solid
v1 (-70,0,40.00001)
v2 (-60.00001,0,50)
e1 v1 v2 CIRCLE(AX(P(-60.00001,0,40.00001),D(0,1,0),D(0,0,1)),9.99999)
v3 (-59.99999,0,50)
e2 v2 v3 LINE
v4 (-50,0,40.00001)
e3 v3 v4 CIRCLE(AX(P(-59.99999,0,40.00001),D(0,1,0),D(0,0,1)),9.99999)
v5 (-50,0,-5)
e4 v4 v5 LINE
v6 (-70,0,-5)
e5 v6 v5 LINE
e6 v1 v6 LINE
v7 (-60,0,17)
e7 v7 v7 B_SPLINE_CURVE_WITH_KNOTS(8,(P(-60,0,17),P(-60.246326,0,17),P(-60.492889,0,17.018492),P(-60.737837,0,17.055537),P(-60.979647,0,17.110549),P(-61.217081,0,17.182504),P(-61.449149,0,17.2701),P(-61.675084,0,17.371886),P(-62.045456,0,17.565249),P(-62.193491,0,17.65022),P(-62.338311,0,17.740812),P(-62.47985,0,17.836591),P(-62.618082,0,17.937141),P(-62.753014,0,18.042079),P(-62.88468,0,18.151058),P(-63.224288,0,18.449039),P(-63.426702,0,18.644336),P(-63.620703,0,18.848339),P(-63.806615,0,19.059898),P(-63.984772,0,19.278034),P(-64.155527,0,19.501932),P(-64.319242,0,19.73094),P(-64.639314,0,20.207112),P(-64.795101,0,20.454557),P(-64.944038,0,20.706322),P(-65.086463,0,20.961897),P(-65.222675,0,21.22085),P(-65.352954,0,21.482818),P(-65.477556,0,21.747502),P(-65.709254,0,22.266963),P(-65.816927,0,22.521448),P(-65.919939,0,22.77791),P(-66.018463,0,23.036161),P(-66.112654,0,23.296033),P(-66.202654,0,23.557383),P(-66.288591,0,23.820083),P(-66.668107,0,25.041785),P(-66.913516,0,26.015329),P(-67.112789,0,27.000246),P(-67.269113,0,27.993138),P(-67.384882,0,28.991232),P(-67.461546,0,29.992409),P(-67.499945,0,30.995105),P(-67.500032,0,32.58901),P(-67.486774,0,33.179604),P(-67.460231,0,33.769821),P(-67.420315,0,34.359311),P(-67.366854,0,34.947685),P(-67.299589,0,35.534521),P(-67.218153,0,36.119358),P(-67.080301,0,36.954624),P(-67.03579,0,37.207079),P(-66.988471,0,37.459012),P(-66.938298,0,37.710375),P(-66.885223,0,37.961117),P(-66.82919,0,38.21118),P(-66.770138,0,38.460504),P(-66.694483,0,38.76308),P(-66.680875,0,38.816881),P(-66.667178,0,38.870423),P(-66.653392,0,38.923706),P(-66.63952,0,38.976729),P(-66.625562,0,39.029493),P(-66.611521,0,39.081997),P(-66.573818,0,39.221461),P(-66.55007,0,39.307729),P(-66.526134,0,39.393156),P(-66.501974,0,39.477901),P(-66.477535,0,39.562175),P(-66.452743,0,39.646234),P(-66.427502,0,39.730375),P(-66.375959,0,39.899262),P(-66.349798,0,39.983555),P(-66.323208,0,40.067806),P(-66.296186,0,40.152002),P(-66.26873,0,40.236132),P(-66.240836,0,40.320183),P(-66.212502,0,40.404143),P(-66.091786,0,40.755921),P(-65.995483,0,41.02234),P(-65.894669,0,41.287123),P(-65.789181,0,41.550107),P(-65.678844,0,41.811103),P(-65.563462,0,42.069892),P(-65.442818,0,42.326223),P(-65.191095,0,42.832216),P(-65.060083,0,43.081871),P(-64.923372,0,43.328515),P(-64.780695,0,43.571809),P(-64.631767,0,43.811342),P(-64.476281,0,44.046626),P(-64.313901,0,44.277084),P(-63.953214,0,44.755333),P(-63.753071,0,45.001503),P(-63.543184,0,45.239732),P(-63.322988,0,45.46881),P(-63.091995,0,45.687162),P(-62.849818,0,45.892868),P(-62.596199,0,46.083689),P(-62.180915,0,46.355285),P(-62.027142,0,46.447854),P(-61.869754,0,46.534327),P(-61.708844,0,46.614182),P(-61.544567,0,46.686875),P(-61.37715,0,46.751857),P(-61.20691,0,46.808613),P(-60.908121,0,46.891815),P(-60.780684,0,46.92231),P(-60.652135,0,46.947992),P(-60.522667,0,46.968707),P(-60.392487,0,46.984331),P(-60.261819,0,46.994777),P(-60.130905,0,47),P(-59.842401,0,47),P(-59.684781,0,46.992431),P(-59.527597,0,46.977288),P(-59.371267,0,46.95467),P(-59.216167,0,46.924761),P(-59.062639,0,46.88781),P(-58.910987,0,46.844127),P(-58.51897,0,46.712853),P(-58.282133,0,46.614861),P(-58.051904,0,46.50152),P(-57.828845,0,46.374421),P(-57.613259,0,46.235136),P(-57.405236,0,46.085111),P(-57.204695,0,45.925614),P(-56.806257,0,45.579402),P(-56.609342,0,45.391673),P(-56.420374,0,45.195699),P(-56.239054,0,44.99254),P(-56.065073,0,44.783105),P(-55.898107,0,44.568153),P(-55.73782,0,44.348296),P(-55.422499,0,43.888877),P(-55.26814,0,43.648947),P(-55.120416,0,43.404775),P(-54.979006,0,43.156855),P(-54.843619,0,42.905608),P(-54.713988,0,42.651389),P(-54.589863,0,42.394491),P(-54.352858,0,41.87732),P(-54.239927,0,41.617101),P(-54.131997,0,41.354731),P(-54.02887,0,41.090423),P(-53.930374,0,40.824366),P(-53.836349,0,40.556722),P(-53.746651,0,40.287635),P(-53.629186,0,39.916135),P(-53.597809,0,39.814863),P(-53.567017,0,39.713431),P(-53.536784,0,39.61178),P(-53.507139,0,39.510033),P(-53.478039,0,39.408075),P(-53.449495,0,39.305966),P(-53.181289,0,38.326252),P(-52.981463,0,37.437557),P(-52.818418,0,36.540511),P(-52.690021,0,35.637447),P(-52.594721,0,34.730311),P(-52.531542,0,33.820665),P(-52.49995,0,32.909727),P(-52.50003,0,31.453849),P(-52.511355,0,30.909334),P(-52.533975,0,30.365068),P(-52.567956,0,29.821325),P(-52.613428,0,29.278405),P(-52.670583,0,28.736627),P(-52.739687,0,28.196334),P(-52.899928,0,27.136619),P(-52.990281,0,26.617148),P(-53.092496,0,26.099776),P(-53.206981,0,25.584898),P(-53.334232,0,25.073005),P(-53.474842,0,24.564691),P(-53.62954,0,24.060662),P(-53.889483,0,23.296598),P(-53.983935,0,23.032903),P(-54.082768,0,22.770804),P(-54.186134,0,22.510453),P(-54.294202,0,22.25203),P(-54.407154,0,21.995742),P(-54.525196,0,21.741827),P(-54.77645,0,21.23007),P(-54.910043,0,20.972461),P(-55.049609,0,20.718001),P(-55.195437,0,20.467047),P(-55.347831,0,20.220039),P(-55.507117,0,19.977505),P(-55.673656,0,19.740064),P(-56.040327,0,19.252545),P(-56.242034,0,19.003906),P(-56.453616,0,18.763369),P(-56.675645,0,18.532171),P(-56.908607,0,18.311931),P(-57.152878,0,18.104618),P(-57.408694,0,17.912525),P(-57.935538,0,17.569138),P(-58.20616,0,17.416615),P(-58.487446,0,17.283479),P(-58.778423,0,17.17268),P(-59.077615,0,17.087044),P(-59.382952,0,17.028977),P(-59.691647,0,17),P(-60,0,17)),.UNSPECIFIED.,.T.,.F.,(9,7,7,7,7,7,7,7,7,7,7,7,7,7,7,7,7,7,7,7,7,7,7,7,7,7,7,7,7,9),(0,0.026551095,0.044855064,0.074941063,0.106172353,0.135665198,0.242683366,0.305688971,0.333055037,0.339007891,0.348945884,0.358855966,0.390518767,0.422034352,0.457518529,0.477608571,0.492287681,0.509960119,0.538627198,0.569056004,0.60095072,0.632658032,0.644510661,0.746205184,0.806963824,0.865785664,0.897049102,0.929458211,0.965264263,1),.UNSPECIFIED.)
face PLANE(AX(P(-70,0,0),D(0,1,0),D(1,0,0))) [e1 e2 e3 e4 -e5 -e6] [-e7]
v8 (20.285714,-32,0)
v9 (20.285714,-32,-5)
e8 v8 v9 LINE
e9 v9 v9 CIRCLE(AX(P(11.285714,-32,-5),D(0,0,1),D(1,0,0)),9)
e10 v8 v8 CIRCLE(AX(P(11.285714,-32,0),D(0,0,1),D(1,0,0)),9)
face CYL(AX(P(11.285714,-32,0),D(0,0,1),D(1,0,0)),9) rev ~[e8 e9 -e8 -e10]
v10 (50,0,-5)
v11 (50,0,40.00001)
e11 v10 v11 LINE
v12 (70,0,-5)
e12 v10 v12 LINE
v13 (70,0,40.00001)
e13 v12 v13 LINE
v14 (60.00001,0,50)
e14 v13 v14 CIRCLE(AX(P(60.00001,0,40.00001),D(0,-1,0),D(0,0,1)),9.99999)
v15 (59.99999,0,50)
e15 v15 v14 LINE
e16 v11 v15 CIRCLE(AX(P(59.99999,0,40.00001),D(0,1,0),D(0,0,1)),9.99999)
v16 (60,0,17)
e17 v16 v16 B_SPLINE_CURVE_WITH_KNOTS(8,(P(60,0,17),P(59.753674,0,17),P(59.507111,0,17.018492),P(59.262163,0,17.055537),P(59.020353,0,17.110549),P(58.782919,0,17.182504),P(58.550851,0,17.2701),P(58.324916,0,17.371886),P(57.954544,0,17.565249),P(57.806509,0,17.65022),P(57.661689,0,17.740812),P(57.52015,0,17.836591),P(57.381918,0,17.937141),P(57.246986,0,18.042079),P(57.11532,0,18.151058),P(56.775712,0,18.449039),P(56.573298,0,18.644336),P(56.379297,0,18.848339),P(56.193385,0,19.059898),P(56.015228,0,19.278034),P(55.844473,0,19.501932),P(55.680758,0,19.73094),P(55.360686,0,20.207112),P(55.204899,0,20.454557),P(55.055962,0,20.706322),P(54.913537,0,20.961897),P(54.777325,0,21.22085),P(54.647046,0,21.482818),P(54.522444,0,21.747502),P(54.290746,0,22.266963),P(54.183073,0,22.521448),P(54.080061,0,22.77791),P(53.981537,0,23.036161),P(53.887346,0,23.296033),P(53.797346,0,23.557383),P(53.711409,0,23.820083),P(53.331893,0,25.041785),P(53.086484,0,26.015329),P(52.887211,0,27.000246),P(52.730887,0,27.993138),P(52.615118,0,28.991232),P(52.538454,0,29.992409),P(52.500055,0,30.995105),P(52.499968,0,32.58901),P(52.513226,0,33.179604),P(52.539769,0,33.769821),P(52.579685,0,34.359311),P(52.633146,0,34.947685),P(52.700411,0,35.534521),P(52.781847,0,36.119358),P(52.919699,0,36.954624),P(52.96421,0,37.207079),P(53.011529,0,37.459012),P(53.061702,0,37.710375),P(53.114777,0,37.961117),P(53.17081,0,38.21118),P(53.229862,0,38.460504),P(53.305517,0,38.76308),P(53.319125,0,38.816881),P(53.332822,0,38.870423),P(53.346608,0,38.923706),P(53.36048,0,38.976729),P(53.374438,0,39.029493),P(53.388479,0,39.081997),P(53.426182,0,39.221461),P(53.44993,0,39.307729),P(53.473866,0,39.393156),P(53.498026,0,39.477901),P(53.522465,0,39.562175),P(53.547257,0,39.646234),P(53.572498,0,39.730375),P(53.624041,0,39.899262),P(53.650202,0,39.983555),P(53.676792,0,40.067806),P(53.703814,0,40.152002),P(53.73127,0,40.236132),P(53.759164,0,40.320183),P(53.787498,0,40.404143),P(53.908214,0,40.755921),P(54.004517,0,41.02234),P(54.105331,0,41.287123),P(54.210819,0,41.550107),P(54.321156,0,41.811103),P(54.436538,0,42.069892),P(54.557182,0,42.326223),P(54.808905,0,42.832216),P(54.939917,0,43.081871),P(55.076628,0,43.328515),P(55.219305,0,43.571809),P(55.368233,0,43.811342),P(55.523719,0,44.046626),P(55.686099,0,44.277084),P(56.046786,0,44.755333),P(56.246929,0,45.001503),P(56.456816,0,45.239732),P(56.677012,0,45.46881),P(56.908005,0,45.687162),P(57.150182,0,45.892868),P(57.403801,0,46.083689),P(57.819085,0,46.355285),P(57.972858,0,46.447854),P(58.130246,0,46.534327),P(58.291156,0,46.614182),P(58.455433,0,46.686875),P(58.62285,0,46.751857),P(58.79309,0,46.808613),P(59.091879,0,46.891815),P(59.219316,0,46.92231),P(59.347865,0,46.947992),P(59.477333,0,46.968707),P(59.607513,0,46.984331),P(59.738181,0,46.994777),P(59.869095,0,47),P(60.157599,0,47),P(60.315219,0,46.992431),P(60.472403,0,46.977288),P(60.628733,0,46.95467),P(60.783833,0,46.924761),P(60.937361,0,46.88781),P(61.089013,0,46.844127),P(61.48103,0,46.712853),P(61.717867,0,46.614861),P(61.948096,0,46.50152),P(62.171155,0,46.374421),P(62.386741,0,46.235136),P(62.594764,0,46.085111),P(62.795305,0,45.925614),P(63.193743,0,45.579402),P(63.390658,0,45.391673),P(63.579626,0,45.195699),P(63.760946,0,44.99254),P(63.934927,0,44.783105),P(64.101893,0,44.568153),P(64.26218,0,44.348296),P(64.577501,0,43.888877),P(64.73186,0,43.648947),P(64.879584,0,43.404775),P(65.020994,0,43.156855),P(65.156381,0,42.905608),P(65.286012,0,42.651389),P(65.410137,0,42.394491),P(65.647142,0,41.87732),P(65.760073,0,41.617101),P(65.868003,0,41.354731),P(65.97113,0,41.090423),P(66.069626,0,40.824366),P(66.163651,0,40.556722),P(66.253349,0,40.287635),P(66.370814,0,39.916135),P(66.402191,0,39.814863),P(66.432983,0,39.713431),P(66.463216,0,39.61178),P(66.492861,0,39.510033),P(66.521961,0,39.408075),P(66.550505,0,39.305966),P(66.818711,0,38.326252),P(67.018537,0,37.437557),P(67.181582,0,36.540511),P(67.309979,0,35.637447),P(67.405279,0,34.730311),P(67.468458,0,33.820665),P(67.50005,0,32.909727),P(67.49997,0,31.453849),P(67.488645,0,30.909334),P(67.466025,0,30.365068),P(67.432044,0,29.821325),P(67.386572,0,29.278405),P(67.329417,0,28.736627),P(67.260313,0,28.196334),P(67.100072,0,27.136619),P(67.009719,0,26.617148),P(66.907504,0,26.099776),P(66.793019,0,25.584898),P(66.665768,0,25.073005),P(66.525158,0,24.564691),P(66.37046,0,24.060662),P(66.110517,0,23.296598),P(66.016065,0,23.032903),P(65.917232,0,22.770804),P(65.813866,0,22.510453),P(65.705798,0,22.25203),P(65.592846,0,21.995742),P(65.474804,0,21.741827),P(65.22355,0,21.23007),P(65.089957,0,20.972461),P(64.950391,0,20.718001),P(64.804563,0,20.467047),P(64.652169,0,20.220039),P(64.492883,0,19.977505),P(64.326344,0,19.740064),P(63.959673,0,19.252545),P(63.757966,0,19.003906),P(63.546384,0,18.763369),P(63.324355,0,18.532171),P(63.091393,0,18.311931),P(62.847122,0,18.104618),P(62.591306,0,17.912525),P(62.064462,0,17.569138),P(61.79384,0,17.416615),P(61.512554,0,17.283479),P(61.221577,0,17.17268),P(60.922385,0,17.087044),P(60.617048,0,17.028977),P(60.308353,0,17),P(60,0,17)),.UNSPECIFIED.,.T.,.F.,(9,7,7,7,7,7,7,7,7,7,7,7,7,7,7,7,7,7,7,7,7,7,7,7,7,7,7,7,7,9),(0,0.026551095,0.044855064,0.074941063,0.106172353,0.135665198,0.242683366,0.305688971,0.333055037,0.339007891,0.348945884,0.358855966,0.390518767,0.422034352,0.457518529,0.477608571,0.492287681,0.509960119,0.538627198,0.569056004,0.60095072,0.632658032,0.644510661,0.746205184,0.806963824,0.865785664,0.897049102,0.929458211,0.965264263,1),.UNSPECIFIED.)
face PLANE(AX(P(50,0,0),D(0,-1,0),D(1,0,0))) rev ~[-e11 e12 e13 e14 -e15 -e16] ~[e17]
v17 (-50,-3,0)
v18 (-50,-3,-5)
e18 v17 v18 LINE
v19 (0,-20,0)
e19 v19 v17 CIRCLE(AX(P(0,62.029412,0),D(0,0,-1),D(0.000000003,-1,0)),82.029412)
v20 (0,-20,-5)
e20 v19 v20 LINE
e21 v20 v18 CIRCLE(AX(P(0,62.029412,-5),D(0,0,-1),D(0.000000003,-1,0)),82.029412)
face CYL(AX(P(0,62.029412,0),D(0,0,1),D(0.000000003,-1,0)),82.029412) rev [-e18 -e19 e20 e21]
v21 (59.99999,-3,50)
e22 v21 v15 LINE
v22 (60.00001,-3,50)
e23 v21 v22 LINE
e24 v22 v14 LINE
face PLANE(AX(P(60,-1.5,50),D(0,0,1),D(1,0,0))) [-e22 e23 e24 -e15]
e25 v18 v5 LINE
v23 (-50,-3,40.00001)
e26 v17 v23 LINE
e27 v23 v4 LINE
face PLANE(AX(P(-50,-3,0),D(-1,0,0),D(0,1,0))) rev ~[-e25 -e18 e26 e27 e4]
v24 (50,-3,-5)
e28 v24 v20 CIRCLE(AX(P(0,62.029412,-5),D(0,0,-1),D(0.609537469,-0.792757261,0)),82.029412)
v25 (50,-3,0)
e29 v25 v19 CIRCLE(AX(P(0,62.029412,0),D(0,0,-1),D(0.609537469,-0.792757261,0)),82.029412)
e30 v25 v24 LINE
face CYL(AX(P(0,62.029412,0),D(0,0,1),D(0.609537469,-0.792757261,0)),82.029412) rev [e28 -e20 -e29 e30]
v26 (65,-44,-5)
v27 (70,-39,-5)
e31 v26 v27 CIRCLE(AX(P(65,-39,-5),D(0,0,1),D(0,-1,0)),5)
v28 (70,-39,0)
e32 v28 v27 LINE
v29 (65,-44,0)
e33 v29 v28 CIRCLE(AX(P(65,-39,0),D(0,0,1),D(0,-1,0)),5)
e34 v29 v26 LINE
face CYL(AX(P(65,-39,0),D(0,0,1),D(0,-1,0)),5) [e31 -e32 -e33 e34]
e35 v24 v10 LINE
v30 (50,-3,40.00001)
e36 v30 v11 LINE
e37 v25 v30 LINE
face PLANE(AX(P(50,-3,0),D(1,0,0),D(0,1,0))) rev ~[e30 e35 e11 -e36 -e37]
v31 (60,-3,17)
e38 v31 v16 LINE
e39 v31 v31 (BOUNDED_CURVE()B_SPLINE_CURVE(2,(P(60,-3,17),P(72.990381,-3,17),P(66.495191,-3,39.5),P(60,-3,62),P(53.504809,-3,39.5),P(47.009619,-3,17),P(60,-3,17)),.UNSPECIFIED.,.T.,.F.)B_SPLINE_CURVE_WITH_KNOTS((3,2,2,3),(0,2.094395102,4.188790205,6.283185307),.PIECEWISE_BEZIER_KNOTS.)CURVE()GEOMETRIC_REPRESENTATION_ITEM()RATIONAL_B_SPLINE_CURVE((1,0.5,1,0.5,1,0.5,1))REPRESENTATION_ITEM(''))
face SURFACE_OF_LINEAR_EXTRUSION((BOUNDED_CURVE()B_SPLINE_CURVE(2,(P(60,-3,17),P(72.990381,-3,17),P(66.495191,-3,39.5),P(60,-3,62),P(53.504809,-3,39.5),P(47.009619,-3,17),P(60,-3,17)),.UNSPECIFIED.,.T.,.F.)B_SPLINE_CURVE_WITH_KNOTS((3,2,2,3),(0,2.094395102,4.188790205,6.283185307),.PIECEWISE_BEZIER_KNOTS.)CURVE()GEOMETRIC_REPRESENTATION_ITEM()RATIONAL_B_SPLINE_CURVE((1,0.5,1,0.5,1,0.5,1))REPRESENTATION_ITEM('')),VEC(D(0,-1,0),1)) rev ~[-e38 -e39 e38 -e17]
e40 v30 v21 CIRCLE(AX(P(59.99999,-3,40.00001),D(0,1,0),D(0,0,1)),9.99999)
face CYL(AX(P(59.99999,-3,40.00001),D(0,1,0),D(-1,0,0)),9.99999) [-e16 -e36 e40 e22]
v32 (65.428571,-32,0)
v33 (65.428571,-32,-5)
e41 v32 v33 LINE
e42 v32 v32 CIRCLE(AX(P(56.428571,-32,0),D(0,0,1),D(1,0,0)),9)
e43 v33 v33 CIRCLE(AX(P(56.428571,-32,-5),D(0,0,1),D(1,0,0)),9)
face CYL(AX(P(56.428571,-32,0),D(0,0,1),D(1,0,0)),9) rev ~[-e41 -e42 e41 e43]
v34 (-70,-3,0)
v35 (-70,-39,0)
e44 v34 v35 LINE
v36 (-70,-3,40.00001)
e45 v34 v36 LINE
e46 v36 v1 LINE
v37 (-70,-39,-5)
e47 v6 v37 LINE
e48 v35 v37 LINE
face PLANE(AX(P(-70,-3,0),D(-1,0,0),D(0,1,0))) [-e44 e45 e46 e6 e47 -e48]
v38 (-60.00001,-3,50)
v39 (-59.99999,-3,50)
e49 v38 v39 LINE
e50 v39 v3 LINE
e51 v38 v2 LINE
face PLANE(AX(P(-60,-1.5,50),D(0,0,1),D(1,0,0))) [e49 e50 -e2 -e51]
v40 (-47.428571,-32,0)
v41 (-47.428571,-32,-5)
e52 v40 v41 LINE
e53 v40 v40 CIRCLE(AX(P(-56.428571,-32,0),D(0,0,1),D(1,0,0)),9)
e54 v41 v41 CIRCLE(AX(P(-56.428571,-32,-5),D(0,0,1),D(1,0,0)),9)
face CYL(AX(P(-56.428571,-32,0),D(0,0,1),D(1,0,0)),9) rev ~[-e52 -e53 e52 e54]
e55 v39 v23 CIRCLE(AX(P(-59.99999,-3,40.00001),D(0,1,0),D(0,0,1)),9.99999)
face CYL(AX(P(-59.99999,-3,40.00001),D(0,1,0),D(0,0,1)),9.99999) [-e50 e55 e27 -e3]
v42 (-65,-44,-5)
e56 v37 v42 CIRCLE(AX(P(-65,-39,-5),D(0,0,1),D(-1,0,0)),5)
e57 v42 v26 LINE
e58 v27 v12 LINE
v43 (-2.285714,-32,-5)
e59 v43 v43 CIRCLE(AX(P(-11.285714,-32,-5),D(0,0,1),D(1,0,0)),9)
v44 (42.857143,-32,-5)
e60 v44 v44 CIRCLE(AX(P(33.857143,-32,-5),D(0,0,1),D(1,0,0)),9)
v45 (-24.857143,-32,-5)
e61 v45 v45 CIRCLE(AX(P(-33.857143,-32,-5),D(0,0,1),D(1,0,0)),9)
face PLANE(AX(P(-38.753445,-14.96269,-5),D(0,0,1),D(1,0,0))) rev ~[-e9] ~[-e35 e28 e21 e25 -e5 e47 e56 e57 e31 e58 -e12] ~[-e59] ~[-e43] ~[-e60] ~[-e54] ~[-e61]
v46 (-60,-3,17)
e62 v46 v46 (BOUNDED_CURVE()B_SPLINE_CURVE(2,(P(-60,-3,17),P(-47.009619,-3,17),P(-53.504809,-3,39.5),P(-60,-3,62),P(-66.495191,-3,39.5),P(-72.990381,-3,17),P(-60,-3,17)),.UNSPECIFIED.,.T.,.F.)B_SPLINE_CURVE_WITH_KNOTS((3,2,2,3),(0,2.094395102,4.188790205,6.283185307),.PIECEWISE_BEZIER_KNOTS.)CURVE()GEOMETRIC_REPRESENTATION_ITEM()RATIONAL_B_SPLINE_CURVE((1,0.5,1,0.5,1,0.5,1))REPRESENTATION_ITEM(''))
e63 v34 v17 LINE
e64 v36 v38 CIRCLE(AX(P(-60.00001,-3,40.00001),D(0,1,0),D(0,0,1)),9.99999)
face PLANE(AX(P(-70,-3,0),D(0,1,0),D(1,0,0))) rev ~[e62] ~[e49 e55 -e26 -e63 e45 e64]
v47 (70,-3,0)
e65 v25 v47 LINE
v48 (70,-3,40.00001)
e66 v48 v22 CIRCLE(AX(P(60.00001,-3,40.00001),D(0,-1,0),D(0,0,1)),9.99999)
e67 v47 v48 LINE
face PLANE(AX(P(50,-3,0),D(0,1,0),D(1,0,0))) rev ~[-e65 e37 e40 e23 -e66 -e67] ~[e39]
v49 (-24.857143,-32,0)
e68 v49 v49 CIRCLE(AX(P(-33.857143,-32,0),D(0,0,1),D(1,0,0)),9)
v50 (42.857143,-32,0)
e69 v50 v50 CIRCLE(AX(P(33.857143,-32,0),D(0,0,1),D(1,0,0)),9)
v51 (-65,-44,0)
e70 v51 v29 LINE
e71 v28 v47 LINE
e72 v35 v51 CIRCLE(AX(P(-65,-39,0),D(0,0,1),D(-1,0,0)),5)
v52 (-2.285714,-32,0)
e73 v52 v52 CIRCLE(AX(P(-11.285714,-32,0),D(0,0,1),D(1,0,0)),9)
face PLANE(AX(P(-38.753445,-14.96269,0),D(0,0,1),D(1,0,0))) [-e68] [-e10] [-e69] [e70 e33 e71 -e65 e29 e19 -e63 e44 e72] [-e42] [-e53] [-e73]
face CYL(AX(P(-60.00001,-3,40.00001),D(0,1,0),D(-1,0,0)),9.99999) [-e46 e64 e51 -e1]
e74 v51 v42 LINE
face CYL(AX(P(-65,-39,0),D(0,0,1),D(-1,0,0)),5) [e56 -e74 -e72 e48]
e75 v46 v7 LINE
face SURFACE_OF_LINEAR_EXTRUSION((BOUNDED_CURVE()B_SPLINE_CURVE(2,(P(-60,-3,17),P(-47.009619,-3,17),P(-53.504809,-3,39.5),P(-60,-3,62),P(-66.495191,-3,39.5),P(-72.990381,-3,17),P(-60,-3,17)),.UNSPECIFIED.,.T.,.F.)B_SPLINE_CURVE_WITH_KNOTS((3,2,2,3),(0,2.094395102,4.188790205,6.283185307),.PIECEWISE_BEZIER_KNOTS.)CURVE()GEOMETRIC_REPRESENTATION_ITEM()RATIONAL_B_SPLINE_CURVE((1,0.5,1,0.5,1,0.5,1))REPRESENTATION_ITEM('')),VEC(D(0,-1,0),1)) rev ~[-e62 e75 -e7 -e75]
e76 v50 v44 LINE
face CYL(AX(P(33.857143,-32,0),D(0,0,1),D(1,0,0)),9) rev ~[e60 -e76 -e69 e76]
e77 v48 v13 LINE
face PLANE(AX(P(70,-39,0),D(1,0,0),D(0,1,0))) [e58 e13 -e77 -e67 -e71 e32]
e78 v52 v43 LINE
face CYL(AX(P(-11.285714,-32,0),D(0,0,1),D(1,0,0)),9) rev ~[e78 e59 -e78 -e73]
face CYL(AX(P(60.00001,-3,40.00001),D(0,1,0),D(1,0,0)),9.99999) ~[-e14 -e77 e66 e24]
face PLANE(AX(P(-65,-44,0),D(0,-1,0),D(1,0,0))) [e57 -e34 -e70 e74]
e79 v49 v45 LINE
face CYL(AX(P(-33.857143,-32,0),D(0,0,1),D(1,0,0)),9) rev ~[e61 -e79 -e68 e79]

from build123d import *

# Parameters (mm, degrees)
F0_R     = 9
F0_W     = 20
F0_H     = 3
F1_DEPTH = 5
F2_DEPTH = 50
F4_DEPTH = 12.5
F5_R     = 9.99999


# Not quite as in the source:
# - a fillet or chamfer is up to 0.001 mm smaller than in the source, because OpenCascade refuses the exact size


with BuildPart() as f1:
    # F0 (on Top) → F1 (new body)
    with BuildSketch(Plane.XY):
        with BuildLine():
            Line((-70, -3), (-70, -20))
            Line((-70, -20), (2.765e-07, -20))
            ThreePointArc((2.765e-07, -20), (-26.4054917221, -15.6337996122), (-50, -3))
            Line((-50, -3), (-70, -3))
        make_face()
        with BuildLine():
            Line((2.765e-07, -20), (-70, -20))
            Line((-70, -20), (-70, -39))
            ThreePointArc((-70, -39), (-68.5355339059, -42.5355339059), (-65, -44))
            Line((-65, -44), (65, -44))
            ThreePointArc((65, -44), (68.5355339059, -42.5355339059), (70, -39))
            Line((70, -39), (70, -20))
            Line((70, -20), (2.765e-07, -20))
        make_face()
        with Locations((-56.4285714286, -32)):
            Circle(F0_R, mode=Mode.SUBTRACT)
        with Locations((-33.8571428571, -32)):
            Circle(F0_R, mode=Mode.SUBTRACT)
        with Locations((-11.2857142857, -32)):
            Circle(F0_R, mode=Mode.SUBTRACT)
        with Locations((11.2857142857, -32)):
            Circle(F0_R, mode=Mode.SUBTRACT)
        with Locations((33.8571428571, -32)):
            Circle(F0_R, mode=Mode.SUBTRACT)
        with Locations((56.4285714286, -32)):
            Circle(F0_R, mode=Mode.SUBTRACT)
        with BuildLine():
            ThreePointArc((50, -3), (26.4054919839, -15.6337995232), (2.765e-07, -20))
            Line((2.765e-07, -20), (70, -20))
            Line((70, -20), (70, -3))
            Line((70, -3), (50, -3))
        make_face()
        with Locations((-60, -1.5)):
            Rectangle(F0_W, F0_H)
        with Locations((60, -1.5)):
            Rectangle(F0_W, F0_H)
    extrude(amount=-F1_DEPTH)

    # F0 (on Top) → F2 (join)
    with BuildSketch(Plane.XY):
        with Locations((-60, -1.5)):
            Rectangle(F0_W, F0_H)
        with Locations((60, -1.5)):
            Rectangle(F0_W, F0_H)
    extrude(amount=F2_DEPTH)

    # F3 (on face) → F4 (cut, symmetric)
    with BuildSketch(Plane.XZ.offset(3)):
        with BuildLine():
            add(Edge.make_bspline(
                [(-60, 17), (-47.0096189432, 17), (-53.5048094716, 39.5), (-60, 62), (-66.4951905284, 39.5), (-72.9903810568, 17), (-60, 17)],
                knots=[0, 0, 0, 2.0943951024, 2.0943951024, 4.1887902048, 4.1887902048, 6.2831853072, 6.2831853072, 6.2831853072], degree=2, weights=[1, 0.5, 1, 0.5, 1, 0.5, 1]))
        make_face()
        with BuildLine():
            add(Edge.make_bspline(
                [(60, 17), (72.9903810568, 17), (66.4951905284, 39.5), (60, 62), (53.5048094716, 39.5), (47.0096189432, 17), (60, 17)],
                knots=[0, 0, 0, 2.0943951024, 2.0943951024, 4.1887902048, 4.1887902048, 6.2831853072, 6.2831853072, 6.2831853072], degree=2, weights=[1, 0.5, 1, 0.5, 1, 0.5, 1]))
        make_face()
    extrude(amount=F4_DEPTH, both=True, mode=Mode.SUBTRACT)

    # F5 (radius 10 in the source; OpenCascade refuses exactly that, so slightly less here)
    f5_edges = [f1.edges().sort_by_distance(p)[0] for p in [
        (-70, -1.5, 50),
        (-50, -1.5, 50),
        (70, -1.5, 50),
        (50, -1.5, 50),
    ]]
    fillet(f5_edges, radius=F5_R)


solid = f1.part
